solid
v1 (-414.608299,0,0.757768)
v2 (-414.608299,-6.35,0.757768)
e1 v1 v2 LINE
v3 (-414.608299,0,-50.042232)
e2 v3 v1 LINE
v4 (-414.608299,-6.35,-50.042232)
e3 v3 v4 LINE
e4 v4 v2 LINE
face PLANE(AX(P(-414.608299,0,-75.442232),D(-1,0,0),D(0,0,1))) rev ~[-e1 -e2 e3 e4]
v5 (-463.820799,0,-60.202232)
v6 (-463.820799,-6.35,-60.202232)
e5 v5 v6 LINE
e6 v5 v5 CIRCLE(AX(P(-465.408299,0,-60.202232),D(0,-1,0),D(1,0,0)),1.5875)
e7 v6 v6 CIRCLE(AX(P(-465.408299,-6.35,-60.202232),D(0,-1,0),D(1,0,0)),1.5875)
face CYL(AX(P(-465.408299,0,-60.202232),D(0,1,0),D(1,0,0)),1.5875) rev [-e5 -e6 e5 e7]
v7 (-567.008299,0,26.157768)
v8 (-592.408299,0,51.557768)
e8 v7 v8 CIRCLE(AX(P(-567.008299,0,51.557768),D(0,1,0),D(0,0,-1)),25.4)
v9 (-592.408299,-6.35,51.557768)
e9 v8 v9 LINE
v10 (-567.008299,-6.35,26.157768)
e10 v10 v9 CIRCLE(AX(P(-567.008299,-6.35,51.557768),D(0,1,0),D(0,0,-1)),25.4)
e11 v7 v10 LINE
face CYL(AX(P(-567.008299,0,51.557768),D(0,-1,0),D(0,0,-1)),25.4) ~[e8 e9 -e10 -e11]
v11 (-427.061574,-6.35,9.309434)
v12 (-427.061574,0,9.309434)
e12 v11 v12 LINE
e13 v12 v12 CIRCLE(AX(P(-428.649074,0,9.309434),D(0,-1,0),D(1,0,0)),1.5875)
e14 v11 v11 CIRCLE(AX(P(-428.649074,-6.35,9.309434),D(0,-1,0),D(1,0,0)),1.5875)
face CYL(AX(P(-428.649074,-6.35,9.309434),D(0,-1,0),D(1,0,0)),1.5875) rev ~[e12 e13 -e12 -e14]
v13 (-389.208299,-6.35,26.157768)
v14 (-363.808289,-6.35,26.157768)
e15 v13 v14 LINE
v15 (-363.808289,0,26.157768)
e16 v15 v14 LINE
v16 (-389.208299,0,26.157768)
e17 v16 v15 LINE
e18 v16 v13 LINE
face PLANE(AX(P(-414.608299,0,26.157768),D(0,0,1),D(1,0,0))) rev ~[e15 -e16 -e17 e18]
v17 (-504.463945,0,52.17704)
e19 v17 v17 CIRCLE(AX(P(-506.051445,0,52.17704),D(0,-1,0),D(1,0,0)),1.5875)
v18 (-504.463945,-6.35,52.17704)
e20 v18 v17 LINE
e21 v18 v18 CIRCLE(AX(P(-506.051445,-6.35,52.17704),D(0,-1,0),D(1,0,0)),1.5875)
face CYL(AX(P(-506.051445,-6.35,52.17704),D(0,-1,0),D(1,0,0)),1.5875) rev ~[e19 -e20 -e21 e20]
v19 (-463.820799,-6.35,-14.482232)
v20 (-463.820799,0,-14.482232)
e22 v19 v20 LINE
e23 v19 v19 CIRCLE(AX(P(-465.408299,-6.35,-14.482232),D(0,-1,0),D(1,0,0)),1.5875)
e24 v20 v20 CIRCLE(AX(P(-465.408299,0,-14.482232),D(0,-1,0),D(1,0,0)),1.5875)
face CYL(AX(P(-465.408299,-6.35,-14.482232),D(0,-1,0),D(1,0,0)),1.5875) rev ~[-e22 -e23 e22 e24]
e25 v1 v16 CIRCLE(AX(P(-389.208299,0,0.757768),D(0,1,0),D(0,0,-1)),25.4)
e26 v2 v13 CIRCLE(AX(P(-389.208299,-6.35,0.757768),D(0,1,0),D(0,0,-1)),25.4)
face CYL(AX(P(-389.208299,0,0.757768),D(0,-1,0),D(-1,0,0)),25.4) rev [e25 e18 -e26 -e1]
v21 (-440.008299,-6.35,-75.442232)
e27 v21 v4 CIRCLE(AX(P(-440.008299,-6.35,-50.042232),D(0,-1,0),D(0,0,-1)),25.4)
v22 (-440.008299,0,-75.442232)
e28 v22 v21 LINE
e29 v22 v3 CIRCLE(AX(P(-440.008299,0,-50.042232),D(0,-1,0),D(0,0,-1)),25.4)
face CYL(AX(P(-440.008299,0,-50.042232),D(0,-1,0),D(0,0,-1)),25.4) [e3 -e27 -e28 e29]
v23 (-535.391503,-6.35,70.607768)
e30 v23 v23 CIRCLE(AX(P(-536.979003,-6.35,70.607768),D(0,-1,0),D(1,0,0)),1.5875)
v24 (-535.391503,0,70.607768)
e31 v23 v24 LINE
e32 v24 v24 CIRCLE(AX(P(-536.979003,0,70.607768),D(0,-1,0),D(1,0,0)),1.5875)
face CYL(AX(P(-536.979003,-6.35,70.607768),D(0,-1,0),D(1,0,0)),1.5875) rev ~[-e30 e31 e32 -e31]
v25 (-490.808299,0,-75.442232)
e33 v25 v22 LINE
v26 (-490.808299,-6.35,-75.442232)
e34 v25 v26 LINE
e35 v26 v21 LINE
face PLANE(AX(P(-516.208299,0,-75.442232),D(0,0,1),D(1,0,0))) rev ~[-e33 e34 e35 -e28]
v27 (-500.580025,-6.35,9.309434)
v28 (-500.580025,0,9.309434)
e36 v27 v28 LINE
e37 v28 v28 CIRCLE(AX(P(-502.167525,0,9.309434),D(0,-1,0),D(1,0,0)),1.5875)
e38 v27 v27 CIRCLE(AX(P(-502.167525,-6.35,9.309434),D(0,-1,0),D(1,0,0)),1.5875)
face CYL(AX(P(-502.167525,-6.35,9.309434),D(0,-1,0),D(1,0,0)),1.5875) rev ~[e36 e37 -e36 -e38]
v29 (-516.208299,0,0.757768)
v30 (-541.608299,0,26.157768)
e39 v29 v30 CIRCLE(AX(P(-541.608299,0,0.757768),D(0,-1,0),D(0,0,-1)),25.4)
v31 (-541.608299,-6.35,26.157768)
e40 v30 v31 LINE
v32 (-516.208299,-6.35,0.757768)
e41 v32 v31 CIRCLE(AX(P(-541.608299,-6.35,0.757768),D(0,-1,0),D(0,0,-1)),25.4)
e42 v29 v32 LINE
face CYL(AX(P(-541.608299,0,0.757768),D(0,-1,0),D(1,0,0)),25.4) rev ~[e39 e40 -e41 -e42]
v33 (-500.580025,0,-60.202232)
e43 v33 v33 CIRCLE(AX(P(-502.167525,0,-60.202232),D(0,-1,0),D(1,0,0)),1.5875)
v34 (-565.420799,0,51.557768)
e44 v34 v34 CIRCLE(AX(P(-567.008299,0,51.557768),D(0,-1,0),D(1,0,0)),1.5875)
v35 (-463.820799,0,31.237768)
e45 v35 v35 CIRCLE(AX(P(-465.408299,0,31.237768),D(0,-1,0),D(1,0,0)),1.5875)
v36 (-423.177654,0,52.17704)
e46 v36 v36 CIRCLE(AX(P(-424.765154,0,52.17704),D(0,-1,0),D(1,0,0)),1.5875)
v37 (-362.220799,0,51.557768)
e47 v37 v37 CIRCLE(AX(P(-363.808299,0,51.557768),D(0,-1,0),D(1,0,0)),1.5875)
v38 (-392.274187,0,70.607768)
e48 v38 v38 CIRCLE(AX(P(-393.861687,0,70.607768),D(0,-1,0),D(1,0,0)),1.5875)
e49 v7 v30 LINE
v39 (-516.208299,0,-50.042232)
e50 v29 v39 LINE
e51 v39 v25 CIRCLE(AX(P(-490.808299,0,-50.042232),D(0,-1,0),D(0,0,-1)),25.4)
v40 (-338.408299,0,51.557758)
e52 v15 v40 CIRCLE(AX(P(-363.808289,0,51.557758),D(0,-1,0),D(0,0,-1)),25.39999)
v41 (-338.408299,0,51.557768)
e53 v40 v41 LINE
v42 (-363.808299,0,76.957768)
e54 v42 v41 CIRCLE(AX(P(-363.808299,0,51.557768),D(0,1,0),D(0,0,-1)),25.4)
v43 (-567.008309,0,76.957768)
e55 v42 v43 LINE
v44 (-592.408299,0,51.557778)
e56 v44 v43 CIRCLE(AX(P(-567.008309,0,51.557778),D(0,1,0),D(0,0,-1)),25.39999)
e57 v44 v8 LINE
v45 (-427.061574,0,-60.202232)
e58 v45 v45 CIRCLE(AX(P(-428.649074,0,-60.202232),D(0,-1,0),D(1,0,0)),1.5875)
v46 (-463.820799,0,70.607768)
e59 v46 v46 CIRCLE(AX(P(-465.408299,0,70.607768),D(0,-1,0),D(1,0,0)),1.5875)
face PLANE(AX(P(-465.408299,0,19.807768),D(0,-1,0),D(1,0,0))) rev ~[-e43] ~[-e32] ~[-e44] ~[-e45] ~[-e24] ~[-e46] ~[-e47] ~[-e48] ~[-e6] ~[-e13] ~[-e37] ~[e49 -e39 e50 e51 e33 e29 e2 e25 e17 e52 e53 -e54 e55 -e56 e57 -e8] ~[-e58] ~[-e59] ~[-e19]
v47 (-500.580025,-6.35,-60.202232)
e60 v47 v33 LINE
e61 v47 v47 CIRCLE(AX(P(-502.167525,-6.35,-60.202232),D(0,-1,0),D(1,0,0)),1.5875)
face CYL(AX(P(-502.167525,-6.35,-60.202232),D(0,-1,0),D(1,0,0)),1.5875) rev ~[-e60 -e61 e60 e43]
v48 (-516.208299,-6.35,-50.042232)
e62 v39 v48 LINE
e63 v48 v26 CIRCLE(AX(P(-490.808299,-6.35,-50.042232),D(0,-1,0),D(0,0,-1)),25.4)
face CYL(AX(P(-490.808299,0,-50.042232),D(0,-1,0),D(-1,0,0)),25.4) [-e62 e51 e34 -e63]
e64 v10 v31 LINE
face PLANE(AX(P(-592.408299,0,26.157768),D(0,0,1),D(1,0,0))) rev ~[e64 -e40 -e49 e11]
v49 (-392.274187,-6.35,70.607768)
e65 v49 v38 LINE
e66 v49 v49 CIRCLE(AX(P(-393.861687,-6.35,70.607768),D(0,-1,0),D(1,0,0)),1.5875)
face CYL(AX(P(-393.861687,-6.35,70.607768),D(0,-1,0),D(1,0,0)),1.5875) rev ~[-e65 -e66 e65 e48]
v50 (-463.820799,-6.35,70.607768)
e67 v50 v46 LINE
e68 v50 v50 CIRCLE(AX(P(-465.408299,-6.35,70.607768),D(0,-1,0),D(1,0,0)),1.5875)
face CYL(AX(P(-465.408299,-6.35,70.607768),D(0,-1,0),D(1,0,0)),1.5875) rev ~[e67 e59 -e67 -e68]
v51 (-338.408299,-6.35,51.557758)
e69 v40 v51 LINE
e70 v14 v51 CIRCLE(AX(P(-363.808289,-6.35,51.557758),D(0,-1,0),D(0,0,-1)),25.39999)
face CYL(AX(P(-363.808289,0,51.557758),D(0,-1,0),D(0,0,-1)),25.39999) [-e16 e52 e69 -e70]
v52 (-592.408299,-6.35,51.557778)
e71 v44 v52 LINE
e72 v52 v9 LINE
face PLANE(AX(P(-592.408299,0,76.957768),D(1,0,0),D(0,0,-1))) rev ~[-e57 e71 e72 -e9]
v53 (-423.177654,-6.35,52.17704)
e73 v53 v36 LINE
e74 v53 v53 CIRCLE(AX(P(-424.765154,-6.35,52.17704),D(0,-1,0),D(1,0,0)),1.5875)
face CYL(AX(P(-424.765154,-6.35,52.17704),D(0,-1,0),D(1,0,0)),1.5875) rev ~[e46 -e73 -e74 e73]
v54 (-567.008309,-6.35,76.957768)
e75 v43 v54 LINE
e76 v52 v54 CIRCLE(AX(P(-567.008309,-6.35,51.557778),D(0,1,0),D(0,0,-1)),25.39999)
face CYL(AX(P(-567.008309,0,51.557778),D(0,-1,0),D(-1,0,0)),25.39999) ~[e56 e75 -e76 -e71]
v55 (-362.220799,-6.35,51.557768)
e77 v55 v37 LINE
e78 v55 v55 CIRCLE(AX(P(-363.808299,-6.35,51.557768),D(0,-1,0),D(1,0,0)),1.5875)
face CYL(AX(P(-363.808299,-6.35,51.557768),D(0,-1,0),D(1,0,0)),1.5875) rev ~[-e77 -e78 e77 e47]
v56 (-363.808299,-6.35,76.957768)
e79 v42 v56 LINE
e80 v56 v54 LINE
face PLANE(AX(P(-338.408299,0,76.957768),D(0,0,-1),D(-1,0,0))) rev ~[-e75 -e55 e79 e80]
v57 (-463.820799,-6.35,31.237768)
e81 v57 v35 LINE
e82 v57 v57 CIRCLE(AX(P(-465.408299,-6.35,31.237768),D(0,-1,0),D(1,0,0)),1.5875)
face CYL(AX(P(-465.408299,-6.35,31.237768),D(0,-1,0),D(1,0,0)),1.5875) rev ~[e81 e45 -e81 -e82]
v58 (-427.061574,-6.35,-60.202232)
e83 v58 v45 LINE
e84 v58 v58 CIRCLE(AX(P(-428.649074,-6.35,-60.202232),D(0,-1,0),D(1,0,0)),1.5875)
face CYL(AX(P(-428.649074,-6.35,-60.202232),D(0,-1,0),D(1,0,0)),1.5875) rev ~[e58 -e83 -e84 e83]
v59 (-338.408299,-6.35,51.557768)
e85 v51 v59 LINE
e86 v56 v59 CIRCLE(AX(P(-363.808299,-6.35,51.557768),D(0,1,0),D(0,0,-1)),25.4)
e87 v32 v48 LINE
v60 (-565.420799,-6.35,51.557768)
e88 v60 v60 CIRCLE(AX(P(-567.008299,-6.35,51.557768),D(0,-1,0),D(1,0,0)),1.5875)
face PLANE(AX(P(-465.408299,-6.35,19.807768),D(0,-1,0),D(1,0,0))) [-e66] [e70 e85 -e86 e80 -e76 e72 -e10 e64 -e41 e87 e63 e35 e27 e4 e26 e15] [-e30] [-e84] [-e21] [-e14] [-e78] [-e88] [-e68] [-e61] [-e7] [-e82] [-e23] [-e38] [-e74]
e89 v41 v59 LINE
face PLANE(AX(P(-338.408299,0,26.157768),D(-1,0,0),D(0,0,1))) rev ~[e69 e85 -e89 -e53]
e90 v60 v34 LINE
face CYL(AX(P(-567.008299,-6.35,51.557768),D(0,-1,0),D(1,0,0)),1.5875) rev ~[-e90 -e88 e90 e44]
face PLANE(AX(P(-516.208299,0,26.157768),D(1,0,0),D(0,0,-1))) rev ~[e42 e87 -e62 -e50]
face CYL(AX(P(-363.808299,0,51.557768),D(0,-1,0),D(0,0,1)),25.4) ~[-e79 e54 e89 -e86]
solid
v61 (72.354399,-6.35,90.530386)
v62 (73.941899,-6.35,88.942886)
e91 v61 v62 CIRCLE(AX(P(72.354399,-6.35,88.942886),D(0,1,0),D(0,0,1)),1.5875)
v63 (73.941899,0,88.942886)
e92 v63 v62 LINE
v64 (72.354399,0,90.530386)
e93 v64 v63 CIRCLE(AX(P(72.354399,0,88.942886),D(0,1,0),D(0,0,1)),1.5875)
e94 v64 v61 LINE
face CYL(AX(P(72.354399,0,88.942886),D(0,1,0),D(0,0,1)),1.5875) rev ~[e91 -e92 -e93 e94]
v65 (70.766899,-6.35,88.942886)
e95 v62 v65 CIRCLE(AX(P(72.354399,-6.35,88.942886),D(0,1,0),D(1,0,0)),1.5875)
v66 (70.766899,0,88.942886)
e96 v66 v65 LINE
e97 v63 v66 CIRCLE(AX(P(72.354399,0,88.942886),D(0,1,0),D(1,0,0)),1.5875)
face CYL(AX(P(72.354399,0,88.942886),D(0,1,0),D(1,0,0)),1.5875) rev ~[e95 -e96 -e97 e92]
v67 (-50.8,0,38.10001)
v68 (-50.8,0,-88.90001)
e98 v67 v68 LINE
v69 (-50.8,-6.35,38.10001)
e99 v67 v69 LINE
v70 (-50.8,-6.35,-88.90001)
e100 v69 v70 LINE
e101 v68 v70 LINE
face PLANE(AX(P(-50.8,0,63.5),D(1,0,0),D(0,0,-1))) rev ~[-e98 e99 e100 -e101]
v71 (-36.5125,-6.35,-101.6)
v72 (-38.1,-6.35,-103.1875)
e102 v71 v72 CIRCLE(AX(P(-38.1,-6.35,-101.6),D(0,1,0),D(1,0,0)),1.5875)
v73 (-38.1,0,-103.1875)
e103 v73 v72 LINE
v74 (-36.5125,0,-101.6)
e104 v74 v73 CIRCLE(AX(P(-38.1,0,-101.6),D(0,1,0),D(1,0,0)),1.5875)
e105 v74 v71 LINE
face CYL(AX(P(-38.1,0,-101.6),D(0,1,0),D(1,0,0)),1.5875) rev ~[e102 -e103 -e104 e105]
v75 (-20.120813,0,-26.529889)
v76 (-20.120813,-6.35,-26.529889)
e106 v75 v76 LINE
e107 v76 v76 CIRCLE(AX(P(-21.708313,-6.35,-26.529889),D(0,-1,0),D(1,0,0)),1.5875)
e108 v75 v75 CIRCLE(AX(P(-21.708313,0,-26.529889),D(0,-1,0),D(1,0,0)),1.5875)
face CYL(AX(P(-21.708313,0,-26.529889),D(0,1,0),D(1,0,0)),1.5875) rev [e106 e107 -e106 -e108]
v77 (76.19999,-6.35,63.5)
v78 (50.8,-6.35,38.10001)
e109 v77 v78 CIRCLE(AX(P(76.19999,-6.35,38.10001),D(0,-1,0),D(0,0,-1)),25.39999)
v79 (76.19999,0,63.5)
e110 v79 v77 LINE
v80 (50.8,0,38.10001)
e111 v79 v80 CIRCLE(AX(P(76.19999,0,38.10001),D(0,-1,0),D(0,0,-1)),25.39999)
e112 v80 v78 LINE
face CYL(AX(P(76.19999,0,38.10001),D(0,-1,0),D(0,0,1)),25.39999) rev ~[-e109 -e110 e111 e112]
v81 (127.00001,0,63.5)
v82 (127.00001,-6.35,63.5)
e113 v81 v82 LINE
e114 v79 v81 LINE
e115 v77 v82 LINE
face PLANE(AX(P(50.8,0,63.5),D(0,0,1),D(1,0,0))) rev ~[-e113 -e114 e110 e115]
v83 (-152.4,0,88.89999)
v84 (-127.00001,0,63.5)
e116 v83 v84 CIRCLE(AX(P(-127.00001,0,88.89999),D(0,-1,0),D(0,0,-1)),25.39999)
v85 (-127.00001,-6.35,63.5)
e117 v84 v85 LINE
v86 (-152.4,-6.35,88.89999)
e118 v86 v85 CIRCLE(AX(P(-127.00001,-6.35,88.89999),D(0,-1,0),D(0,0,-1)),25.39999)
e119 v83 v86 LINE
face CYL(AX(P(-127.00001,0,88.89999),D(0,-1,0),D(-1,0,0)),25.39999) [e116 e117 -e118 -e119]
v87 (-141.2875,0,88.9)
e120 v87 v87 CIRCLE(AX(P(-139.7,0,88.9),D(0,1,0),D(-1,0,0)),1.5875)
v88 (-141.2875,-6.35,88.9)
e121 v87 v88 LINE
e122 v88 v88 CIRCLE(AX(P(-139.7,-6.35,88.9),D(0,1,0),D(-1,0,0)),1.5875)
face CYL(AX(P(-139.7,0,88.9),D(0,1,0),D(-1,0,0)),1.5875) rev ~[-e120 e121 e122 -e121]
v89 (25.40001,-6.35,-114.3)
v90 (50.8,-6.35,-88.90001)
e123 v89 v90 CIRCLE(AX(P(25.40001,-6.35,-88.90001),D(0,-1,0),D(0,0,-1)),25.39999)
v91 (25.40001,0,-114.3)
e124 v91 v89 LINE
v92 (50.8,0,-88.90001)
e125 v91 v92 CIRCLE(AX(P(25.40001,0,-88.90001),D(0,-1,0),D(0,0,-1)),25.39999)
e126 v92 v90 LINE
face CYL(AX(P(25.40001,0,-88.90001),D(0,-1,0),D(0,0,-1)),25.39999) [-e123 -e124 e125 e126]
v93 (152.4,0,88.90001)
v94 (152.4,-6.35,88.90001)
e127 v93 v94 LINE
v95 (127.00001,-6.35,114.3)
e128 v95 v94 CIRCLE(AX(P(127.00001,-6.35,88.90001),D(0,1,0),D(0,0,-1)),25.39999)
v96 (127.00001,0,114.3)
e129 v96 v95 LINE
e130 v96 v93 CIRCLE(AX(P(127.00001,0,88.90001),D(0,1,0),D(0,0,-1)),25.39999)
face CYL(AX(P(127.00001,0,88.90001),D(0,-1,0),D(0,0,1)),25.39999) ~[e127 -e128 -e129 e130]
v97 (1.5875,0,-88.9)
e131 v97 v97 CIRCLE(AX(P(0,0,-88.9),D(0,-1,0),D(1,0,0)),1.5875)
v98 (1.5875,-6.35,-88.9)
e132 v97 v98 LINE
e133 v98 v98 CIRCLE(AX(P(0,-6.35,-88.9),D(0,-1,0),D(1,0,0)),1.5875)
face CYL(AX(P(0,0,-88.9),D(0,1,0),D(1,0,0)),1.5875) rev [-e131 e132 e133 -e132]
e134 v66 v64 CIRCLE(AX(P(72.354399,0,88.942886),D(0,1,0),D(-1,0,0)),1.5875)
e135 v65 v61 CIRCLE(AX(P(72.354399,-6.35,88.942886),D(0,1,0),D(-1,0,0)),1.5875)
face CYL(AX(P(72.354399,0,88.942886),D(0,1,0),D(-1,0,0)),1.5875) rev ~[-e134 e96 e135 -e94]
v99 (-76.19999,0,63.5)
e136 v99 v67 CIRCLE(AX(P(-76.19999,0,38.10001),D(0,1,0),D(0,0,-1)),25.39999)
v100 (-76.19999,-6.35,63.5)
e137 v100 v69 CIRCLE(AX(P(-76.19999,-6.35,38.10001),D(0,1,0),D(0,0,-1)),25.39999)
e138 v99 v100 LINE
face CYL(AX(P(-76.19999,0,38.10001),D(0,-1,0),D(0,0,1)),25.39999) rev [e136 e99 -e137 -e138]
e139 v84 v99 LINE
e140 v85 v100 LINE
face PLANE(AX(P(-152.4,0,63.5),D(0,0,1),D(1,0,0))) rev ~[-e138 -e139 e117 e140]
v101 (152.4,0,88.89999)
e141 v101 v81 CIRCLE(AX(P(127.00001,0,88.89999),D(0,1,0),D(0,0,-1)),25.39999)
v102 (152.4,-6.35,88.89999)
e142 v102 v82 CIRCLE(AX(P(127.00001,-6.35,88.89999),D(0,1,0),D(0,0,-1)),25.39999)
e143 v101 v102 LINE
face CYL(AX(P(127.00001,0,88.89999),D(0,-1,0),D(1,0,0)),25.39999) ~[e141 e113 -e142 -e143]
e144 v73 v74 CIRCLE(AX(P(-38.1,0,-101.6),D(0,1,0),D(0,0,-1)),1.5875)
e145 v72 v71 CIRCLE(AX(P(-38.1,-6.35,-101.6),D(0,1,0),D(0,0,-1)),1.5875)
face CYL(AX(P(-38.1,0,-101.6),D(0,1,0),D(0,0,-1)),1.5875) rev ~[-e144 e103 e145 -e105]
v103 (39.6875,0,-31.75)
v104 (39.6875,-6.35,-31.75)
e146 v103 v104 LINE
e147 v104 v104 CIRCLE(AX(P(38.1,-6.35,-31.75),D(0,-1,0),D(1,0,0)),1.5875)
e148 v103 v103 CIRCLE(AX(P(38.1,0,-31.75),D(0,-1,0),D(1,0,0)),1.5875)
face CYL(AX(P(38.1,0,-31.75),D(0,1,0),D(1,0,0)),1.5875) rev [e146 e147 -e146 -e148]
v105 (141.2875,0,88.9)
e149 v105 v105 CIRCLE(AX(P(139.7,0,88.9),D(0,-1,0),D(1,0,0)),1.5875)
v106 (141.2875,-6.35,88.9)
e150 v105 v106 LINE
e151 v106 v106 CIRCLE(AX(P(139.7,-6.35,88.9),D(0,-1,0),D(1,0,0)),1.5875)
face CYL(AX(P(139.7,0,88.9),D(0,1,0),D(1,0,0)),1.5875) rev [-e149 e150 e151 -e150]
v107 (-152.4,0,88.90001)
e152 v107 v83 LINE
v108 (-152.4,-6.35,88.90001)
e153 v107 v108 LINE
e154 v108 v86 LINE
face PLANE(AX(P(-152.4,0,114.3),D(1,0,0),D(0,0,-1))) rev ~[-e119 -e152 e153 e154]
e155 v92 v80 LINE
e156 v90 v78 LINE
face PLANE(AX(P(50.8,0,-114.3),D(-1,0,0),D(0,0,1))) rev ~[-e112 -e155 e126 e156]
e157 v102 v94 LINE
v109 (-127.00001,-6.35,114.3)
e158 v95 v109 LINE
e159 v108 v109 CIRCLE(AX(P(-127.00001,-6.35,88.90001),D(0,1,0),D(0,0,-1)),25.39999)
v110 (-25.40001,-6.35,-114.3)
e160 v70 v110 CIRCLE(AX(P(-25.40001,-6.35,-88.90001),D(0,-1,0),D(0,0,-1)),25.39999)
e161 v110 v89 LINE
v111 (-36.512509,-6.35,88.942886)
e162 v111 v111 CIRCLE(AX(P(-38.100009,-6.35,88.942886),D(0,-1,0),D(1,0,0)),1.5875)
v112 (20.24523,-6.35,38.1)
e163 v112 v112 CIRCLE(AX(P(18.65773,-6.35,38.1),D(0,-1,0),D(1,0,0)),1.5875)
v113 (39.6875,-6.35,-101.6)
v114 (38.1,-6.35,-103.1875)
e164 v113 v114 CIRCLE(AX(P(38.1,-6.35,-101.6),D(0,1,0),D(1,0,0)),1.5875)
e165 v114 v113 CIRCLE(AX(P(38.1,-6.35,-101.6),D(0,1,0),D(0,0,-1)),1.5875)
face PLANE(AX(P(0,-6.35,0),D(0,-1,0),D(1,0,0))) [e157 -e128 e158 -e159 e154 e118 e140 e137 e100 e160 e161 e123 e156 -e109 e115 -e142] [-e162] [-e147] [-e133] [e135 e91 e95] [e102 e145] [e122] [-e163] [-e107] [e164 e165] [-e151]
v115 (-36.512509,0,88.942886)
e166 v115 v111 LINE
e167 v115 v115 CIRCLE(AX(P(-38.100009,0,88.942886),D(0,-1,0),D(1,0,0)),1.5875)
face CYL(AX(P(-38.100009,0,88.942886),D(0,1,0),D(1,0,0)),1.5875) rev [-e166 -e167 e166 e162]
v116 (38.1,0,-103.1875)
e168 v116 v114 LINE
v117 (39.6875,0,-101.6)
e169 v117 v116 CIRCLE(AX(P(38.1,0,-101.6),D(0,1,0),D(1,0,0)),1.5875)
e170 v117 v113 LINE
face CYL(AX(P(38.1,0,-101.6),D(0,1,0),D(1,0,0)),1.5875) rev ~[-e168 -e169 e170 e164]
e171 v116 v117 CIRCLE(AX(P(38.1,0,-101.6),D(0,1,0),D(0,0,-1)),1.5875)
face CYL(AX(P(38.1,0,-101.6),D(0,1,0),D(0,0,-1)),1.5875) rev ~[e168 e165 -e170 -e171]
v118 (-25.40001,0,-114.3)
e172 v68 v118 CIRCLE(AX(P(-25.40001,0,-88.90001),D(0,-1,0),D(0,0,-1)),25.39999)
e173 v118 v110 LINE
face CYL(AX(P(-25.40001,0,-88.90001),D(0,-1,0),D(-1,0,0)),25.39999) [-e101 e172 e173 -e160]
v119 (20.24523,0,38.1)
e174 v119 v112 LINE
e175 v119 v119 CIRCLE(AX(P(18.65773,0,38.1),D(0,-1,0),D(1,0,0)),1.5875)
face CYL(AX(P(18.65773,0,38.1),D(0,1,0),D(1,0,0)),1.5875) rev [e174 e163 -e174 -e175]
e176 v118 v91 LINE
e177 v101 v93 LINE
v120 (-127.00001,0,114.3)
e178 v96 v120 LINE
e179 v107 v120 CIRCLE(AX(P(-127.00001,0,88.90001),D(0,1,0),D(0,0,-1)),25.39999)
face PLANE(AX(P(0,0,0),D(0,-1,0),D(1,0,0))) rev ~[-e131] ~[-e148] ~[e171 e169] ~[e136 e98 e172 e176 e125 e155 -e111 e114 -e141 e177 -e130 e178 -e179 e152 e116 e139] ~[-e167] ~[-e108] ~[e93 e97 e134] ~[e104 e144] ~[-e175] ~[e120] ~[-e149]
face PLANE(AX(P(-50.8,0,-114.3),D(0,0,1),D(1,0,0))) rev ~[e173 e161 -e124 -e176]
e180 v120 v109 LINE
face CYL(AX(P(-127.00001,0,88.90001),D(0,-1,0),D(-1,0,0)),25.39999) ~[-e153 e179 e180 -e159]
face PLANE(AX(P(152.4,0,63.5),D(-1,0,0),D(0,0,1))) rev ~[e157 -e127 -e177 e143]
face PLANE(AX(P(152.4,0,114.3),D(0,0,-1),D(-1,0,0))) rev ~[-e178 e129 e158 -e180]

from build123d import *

# Parameters (mm, degrees)
F0_R     = 1.5875
F1_DEPTH = 6.35
F2_R     = 25.39999
F3_R     = 25.4
F4_R     = 25.39999
F5_R     = 1.5875
F6_DEPTH = 25.4


# Not quite as in the source:
# - a fillet or chamfer is up to 0.001 mm smaller than in the source, because OpenCascade refuses the exact size


with BuildPart() as f1:
    # F0 (on Front) → F1 (new body)
    with BuildSketch(Plane.XZ):
        Polygon((50.8, 114.3), (-50.8, 114.3), (-50.8, 63.5), (-50.8, -114.3), (-38.1, -114.3), (38.1, -114.3), (50.8, -114.3), (50.8, -31.75), (50.8, 63.5), (50.8, 88.9428858587), align=None)
        with BuildLine():
            ThreePointArc((-36.5125, -101.6), (-36.9774679849, -102.7225320151), (-38.1, -103.1875))
            ThreePointArc((-38.1, -103.1875), (-39.2225320151, -100.4774679849), (-36.5125, -101.6))
        make_face(mode=Mode.SUBTRACT)
        with BuildLine():
            ThreePointArc((39.6875, -101.6), (39.2225320151, -102.7225320151), (38.1, -103.1875))
            ThreePointArc((38.1, -103.1875), (36.9774679849, -100.4774679849), (39.6875, -101.6))
        make_face(mode=Mode.SUBTRACT)
        with Locations((0, -88.9)):
            Circle(F0_R, mode=Mode.SUBTRACT)
        with Locations((38.1, -31.75)):
            Circle(F0_R, mode=Mode.SUBTRACT)
        with Locations((-21.7083130796, -26.5298890234)):
            Circle(F0_R, mode=Mode.SUBTRACT)
        with Locations((18.6577301353, 38.1)):
            Circle(F0_R, mode=Mode.SUBTRACT)
        with Locations((-38.1000090512, 88.9428858587)):
            Circle(F0_R, mode=Mode.SUBTRACT)
        Polygon((-50.8, 63.5), (-50.8, 114.3), (-152.4, 114.3), (-152.4, 88.9), (-152.4, 63.5), align=None)
        with BuildLine():
            ThreePointArc((-138.1125, 88.9), (-139.7, 87.3125), (-141.2875, 88.9))
            ThreePointArc((-141.2875, 88.9), (-139.7, 90.4875), (-138.1125, 88.9))
        make_face(mode=Mode.SUBTRACT)
        with BuildLine():
            Line((72.3543986678, 114.3), (50.8, 114.3))
            Line((50.8, 114.3), (50.8, 88.9428858587))
            Line((50.8, 88.9428858587), (70.7668986678, 88.9428858587))
            ThreePointArc((70.7668986678, 88.9428858587), (71.2318666527, 90.0654178738), (72.3543986678, 90.5303858587))
            Line((72.3543986678, 90.5303858587), (72.3543986678, 114.3))
        make_face()
        with BuildLine():
            Line((70.7668986678, 88.9428858587), (50.8, 88.9428858587))
            Line((50.8, 88.9428858587), (50.8, 63.5))
            Line((50.8, 63.5), (152.4, 63.5))
            Line((152.4, 63.5), (152.4, 88.9))
            Line((152.4, 88.9), (152.4, 114.3))
            Line((152.4, 114.3), (72.3543986678, 114.3))
            Line((72.3543986678, 114.3), (72.3543986678, 90.5303858587))
            ThreePointArc((72.3543986678, 90.5303858587), (73.4769306829, 90.0654178738), (73.9418986678, 88.9428858587))
            ThreePointArc((73.9418986678, 88.9428858587), (72.3543986678, 87.3553858587), (70.7668986678, 88.9428858587))
        make_face()
        with Locations((139.7, 88.9)):
            Circle(F0_R, mode=Mode.SUBTRACT)
    extrude(amount=F1_DEPTH)

    # F2 (radius 25.4 in the source; OpenCascade refuses exactly that, so slightly less here)
    f2_edges = [f1.edges().sort_by_distance(p)[0] for p in [
        (-50.8, -3.175, 63.5),
        (50.8, -3.175, 63.5),
        (152.4, -3.175, 63.5),
        (152.4, -3.175, 114.3),
        (50.8, -3.175, -114.3),
        (-50.8, -3.175, -114.3),
        (-152.4, -3.175, 63.5),
        (-152.4, -3.175, 114.3),
    ]]
    fillet(f2_edges, radius=F2_R)


with BuildPart() as f1b:
    # F0 (on Front) → F1, piece 2 (new body)
    with BuildSketch(Plane.XZ):
        Polygon((-516.2082994461, 26.1577678084), (-516.2082994461, -75.4422321916), (-414.6082994461, -75.4422321916), (-414.6082994461, 26.1577678084), (-338.4082994461, 26.1577678084), (-338.4082994461, 76.9577678084), (-592.4082994461, 76.9577678084), (-592.4082994461, 26.1577678084), align=None)
        with Locations((-465.4082994461, -60.2022321916)):
            Circle(F0_R, mode=Mode.SUBTRACT)
    extrude(amount=F1_DEPTH)

    # F3
    f3_edges = [f1b.edges().sort_by_distance(p)[0] for p in [
        (-592.408299, -3.175, 26.157768),
        (-516.208299, -3.175, 26.157768),
        (-516.208299, -3.175, -75.442232),
        (-414.608299, -3.175, 26.157768),
        (-414.608299, -3.175, -75.442232),
        (-338.408299, -3.175, 76.957768),
    ]]
    fillet(f3_edges, radius=F3_R)

    # F4 (radius 25.4 in the source; OpenCascade refuses exactly that, so slightly less here)
    f4_edges = [f1b.edges().sort_by_distance(p)[0] for p in [
        (-338.408299, -3.175, 26.157768),
        (-592.408299, -3.175, 76.957768),
    ]]
    fillet(f4_edges, radius=F4_R)

    # F5 (on face) → F6 (cut)
    with BuildSketch(Plane.XZ.offset(6.35)):
        with Locations((-567.0082994461, 51.5577678084)):
            Circle(F5_R)
        with Locations((-363.8082994461, 104.2201220989)):
            Circle(F5_R)
        with Locations((-363.8082994461, 51.5577678084)):
            Circle(F5_R)
        with Locations((-506.0514450161, 52.1770399586)):
            Circle(F5_R)
        with Locations((-465.4082994461, 31.2377678084)):
            Circle(F5_R)
        with Locations((-465.4082994461, -14.4822321916)):
            Circle(F5_R)
        with Locations((-424.7651538761, 52.1770399586)):
            Circle(F5_R)
        with Locations((-502.1675247718, -60.2022321916)):
            Circle(F5_R)
        with Locations((-428.6490741204, -60.2022321916)):
            Circle(F5_R)
        with Locations((-428.6490741204, 9.309434332)):
            Circle(F5_R)
        with Locations((-502.1675247718, 9.309434332)):
            Circle(F5_R)
        with Locations((-465.4082994461, 70.6077678084)):
            Circle(F5_R)
        with Locations((-536.9790032417, 70.6077678084)):
            Circle(F5_R)
        with Locations((-393.8616867844, 70.6077678084)):
            Circle(F5_R)
    extrude(amount=-F6_DEPTH, mode=Mode.SUBTRACT)


solid = Compound([f1.part, f1b.part])
